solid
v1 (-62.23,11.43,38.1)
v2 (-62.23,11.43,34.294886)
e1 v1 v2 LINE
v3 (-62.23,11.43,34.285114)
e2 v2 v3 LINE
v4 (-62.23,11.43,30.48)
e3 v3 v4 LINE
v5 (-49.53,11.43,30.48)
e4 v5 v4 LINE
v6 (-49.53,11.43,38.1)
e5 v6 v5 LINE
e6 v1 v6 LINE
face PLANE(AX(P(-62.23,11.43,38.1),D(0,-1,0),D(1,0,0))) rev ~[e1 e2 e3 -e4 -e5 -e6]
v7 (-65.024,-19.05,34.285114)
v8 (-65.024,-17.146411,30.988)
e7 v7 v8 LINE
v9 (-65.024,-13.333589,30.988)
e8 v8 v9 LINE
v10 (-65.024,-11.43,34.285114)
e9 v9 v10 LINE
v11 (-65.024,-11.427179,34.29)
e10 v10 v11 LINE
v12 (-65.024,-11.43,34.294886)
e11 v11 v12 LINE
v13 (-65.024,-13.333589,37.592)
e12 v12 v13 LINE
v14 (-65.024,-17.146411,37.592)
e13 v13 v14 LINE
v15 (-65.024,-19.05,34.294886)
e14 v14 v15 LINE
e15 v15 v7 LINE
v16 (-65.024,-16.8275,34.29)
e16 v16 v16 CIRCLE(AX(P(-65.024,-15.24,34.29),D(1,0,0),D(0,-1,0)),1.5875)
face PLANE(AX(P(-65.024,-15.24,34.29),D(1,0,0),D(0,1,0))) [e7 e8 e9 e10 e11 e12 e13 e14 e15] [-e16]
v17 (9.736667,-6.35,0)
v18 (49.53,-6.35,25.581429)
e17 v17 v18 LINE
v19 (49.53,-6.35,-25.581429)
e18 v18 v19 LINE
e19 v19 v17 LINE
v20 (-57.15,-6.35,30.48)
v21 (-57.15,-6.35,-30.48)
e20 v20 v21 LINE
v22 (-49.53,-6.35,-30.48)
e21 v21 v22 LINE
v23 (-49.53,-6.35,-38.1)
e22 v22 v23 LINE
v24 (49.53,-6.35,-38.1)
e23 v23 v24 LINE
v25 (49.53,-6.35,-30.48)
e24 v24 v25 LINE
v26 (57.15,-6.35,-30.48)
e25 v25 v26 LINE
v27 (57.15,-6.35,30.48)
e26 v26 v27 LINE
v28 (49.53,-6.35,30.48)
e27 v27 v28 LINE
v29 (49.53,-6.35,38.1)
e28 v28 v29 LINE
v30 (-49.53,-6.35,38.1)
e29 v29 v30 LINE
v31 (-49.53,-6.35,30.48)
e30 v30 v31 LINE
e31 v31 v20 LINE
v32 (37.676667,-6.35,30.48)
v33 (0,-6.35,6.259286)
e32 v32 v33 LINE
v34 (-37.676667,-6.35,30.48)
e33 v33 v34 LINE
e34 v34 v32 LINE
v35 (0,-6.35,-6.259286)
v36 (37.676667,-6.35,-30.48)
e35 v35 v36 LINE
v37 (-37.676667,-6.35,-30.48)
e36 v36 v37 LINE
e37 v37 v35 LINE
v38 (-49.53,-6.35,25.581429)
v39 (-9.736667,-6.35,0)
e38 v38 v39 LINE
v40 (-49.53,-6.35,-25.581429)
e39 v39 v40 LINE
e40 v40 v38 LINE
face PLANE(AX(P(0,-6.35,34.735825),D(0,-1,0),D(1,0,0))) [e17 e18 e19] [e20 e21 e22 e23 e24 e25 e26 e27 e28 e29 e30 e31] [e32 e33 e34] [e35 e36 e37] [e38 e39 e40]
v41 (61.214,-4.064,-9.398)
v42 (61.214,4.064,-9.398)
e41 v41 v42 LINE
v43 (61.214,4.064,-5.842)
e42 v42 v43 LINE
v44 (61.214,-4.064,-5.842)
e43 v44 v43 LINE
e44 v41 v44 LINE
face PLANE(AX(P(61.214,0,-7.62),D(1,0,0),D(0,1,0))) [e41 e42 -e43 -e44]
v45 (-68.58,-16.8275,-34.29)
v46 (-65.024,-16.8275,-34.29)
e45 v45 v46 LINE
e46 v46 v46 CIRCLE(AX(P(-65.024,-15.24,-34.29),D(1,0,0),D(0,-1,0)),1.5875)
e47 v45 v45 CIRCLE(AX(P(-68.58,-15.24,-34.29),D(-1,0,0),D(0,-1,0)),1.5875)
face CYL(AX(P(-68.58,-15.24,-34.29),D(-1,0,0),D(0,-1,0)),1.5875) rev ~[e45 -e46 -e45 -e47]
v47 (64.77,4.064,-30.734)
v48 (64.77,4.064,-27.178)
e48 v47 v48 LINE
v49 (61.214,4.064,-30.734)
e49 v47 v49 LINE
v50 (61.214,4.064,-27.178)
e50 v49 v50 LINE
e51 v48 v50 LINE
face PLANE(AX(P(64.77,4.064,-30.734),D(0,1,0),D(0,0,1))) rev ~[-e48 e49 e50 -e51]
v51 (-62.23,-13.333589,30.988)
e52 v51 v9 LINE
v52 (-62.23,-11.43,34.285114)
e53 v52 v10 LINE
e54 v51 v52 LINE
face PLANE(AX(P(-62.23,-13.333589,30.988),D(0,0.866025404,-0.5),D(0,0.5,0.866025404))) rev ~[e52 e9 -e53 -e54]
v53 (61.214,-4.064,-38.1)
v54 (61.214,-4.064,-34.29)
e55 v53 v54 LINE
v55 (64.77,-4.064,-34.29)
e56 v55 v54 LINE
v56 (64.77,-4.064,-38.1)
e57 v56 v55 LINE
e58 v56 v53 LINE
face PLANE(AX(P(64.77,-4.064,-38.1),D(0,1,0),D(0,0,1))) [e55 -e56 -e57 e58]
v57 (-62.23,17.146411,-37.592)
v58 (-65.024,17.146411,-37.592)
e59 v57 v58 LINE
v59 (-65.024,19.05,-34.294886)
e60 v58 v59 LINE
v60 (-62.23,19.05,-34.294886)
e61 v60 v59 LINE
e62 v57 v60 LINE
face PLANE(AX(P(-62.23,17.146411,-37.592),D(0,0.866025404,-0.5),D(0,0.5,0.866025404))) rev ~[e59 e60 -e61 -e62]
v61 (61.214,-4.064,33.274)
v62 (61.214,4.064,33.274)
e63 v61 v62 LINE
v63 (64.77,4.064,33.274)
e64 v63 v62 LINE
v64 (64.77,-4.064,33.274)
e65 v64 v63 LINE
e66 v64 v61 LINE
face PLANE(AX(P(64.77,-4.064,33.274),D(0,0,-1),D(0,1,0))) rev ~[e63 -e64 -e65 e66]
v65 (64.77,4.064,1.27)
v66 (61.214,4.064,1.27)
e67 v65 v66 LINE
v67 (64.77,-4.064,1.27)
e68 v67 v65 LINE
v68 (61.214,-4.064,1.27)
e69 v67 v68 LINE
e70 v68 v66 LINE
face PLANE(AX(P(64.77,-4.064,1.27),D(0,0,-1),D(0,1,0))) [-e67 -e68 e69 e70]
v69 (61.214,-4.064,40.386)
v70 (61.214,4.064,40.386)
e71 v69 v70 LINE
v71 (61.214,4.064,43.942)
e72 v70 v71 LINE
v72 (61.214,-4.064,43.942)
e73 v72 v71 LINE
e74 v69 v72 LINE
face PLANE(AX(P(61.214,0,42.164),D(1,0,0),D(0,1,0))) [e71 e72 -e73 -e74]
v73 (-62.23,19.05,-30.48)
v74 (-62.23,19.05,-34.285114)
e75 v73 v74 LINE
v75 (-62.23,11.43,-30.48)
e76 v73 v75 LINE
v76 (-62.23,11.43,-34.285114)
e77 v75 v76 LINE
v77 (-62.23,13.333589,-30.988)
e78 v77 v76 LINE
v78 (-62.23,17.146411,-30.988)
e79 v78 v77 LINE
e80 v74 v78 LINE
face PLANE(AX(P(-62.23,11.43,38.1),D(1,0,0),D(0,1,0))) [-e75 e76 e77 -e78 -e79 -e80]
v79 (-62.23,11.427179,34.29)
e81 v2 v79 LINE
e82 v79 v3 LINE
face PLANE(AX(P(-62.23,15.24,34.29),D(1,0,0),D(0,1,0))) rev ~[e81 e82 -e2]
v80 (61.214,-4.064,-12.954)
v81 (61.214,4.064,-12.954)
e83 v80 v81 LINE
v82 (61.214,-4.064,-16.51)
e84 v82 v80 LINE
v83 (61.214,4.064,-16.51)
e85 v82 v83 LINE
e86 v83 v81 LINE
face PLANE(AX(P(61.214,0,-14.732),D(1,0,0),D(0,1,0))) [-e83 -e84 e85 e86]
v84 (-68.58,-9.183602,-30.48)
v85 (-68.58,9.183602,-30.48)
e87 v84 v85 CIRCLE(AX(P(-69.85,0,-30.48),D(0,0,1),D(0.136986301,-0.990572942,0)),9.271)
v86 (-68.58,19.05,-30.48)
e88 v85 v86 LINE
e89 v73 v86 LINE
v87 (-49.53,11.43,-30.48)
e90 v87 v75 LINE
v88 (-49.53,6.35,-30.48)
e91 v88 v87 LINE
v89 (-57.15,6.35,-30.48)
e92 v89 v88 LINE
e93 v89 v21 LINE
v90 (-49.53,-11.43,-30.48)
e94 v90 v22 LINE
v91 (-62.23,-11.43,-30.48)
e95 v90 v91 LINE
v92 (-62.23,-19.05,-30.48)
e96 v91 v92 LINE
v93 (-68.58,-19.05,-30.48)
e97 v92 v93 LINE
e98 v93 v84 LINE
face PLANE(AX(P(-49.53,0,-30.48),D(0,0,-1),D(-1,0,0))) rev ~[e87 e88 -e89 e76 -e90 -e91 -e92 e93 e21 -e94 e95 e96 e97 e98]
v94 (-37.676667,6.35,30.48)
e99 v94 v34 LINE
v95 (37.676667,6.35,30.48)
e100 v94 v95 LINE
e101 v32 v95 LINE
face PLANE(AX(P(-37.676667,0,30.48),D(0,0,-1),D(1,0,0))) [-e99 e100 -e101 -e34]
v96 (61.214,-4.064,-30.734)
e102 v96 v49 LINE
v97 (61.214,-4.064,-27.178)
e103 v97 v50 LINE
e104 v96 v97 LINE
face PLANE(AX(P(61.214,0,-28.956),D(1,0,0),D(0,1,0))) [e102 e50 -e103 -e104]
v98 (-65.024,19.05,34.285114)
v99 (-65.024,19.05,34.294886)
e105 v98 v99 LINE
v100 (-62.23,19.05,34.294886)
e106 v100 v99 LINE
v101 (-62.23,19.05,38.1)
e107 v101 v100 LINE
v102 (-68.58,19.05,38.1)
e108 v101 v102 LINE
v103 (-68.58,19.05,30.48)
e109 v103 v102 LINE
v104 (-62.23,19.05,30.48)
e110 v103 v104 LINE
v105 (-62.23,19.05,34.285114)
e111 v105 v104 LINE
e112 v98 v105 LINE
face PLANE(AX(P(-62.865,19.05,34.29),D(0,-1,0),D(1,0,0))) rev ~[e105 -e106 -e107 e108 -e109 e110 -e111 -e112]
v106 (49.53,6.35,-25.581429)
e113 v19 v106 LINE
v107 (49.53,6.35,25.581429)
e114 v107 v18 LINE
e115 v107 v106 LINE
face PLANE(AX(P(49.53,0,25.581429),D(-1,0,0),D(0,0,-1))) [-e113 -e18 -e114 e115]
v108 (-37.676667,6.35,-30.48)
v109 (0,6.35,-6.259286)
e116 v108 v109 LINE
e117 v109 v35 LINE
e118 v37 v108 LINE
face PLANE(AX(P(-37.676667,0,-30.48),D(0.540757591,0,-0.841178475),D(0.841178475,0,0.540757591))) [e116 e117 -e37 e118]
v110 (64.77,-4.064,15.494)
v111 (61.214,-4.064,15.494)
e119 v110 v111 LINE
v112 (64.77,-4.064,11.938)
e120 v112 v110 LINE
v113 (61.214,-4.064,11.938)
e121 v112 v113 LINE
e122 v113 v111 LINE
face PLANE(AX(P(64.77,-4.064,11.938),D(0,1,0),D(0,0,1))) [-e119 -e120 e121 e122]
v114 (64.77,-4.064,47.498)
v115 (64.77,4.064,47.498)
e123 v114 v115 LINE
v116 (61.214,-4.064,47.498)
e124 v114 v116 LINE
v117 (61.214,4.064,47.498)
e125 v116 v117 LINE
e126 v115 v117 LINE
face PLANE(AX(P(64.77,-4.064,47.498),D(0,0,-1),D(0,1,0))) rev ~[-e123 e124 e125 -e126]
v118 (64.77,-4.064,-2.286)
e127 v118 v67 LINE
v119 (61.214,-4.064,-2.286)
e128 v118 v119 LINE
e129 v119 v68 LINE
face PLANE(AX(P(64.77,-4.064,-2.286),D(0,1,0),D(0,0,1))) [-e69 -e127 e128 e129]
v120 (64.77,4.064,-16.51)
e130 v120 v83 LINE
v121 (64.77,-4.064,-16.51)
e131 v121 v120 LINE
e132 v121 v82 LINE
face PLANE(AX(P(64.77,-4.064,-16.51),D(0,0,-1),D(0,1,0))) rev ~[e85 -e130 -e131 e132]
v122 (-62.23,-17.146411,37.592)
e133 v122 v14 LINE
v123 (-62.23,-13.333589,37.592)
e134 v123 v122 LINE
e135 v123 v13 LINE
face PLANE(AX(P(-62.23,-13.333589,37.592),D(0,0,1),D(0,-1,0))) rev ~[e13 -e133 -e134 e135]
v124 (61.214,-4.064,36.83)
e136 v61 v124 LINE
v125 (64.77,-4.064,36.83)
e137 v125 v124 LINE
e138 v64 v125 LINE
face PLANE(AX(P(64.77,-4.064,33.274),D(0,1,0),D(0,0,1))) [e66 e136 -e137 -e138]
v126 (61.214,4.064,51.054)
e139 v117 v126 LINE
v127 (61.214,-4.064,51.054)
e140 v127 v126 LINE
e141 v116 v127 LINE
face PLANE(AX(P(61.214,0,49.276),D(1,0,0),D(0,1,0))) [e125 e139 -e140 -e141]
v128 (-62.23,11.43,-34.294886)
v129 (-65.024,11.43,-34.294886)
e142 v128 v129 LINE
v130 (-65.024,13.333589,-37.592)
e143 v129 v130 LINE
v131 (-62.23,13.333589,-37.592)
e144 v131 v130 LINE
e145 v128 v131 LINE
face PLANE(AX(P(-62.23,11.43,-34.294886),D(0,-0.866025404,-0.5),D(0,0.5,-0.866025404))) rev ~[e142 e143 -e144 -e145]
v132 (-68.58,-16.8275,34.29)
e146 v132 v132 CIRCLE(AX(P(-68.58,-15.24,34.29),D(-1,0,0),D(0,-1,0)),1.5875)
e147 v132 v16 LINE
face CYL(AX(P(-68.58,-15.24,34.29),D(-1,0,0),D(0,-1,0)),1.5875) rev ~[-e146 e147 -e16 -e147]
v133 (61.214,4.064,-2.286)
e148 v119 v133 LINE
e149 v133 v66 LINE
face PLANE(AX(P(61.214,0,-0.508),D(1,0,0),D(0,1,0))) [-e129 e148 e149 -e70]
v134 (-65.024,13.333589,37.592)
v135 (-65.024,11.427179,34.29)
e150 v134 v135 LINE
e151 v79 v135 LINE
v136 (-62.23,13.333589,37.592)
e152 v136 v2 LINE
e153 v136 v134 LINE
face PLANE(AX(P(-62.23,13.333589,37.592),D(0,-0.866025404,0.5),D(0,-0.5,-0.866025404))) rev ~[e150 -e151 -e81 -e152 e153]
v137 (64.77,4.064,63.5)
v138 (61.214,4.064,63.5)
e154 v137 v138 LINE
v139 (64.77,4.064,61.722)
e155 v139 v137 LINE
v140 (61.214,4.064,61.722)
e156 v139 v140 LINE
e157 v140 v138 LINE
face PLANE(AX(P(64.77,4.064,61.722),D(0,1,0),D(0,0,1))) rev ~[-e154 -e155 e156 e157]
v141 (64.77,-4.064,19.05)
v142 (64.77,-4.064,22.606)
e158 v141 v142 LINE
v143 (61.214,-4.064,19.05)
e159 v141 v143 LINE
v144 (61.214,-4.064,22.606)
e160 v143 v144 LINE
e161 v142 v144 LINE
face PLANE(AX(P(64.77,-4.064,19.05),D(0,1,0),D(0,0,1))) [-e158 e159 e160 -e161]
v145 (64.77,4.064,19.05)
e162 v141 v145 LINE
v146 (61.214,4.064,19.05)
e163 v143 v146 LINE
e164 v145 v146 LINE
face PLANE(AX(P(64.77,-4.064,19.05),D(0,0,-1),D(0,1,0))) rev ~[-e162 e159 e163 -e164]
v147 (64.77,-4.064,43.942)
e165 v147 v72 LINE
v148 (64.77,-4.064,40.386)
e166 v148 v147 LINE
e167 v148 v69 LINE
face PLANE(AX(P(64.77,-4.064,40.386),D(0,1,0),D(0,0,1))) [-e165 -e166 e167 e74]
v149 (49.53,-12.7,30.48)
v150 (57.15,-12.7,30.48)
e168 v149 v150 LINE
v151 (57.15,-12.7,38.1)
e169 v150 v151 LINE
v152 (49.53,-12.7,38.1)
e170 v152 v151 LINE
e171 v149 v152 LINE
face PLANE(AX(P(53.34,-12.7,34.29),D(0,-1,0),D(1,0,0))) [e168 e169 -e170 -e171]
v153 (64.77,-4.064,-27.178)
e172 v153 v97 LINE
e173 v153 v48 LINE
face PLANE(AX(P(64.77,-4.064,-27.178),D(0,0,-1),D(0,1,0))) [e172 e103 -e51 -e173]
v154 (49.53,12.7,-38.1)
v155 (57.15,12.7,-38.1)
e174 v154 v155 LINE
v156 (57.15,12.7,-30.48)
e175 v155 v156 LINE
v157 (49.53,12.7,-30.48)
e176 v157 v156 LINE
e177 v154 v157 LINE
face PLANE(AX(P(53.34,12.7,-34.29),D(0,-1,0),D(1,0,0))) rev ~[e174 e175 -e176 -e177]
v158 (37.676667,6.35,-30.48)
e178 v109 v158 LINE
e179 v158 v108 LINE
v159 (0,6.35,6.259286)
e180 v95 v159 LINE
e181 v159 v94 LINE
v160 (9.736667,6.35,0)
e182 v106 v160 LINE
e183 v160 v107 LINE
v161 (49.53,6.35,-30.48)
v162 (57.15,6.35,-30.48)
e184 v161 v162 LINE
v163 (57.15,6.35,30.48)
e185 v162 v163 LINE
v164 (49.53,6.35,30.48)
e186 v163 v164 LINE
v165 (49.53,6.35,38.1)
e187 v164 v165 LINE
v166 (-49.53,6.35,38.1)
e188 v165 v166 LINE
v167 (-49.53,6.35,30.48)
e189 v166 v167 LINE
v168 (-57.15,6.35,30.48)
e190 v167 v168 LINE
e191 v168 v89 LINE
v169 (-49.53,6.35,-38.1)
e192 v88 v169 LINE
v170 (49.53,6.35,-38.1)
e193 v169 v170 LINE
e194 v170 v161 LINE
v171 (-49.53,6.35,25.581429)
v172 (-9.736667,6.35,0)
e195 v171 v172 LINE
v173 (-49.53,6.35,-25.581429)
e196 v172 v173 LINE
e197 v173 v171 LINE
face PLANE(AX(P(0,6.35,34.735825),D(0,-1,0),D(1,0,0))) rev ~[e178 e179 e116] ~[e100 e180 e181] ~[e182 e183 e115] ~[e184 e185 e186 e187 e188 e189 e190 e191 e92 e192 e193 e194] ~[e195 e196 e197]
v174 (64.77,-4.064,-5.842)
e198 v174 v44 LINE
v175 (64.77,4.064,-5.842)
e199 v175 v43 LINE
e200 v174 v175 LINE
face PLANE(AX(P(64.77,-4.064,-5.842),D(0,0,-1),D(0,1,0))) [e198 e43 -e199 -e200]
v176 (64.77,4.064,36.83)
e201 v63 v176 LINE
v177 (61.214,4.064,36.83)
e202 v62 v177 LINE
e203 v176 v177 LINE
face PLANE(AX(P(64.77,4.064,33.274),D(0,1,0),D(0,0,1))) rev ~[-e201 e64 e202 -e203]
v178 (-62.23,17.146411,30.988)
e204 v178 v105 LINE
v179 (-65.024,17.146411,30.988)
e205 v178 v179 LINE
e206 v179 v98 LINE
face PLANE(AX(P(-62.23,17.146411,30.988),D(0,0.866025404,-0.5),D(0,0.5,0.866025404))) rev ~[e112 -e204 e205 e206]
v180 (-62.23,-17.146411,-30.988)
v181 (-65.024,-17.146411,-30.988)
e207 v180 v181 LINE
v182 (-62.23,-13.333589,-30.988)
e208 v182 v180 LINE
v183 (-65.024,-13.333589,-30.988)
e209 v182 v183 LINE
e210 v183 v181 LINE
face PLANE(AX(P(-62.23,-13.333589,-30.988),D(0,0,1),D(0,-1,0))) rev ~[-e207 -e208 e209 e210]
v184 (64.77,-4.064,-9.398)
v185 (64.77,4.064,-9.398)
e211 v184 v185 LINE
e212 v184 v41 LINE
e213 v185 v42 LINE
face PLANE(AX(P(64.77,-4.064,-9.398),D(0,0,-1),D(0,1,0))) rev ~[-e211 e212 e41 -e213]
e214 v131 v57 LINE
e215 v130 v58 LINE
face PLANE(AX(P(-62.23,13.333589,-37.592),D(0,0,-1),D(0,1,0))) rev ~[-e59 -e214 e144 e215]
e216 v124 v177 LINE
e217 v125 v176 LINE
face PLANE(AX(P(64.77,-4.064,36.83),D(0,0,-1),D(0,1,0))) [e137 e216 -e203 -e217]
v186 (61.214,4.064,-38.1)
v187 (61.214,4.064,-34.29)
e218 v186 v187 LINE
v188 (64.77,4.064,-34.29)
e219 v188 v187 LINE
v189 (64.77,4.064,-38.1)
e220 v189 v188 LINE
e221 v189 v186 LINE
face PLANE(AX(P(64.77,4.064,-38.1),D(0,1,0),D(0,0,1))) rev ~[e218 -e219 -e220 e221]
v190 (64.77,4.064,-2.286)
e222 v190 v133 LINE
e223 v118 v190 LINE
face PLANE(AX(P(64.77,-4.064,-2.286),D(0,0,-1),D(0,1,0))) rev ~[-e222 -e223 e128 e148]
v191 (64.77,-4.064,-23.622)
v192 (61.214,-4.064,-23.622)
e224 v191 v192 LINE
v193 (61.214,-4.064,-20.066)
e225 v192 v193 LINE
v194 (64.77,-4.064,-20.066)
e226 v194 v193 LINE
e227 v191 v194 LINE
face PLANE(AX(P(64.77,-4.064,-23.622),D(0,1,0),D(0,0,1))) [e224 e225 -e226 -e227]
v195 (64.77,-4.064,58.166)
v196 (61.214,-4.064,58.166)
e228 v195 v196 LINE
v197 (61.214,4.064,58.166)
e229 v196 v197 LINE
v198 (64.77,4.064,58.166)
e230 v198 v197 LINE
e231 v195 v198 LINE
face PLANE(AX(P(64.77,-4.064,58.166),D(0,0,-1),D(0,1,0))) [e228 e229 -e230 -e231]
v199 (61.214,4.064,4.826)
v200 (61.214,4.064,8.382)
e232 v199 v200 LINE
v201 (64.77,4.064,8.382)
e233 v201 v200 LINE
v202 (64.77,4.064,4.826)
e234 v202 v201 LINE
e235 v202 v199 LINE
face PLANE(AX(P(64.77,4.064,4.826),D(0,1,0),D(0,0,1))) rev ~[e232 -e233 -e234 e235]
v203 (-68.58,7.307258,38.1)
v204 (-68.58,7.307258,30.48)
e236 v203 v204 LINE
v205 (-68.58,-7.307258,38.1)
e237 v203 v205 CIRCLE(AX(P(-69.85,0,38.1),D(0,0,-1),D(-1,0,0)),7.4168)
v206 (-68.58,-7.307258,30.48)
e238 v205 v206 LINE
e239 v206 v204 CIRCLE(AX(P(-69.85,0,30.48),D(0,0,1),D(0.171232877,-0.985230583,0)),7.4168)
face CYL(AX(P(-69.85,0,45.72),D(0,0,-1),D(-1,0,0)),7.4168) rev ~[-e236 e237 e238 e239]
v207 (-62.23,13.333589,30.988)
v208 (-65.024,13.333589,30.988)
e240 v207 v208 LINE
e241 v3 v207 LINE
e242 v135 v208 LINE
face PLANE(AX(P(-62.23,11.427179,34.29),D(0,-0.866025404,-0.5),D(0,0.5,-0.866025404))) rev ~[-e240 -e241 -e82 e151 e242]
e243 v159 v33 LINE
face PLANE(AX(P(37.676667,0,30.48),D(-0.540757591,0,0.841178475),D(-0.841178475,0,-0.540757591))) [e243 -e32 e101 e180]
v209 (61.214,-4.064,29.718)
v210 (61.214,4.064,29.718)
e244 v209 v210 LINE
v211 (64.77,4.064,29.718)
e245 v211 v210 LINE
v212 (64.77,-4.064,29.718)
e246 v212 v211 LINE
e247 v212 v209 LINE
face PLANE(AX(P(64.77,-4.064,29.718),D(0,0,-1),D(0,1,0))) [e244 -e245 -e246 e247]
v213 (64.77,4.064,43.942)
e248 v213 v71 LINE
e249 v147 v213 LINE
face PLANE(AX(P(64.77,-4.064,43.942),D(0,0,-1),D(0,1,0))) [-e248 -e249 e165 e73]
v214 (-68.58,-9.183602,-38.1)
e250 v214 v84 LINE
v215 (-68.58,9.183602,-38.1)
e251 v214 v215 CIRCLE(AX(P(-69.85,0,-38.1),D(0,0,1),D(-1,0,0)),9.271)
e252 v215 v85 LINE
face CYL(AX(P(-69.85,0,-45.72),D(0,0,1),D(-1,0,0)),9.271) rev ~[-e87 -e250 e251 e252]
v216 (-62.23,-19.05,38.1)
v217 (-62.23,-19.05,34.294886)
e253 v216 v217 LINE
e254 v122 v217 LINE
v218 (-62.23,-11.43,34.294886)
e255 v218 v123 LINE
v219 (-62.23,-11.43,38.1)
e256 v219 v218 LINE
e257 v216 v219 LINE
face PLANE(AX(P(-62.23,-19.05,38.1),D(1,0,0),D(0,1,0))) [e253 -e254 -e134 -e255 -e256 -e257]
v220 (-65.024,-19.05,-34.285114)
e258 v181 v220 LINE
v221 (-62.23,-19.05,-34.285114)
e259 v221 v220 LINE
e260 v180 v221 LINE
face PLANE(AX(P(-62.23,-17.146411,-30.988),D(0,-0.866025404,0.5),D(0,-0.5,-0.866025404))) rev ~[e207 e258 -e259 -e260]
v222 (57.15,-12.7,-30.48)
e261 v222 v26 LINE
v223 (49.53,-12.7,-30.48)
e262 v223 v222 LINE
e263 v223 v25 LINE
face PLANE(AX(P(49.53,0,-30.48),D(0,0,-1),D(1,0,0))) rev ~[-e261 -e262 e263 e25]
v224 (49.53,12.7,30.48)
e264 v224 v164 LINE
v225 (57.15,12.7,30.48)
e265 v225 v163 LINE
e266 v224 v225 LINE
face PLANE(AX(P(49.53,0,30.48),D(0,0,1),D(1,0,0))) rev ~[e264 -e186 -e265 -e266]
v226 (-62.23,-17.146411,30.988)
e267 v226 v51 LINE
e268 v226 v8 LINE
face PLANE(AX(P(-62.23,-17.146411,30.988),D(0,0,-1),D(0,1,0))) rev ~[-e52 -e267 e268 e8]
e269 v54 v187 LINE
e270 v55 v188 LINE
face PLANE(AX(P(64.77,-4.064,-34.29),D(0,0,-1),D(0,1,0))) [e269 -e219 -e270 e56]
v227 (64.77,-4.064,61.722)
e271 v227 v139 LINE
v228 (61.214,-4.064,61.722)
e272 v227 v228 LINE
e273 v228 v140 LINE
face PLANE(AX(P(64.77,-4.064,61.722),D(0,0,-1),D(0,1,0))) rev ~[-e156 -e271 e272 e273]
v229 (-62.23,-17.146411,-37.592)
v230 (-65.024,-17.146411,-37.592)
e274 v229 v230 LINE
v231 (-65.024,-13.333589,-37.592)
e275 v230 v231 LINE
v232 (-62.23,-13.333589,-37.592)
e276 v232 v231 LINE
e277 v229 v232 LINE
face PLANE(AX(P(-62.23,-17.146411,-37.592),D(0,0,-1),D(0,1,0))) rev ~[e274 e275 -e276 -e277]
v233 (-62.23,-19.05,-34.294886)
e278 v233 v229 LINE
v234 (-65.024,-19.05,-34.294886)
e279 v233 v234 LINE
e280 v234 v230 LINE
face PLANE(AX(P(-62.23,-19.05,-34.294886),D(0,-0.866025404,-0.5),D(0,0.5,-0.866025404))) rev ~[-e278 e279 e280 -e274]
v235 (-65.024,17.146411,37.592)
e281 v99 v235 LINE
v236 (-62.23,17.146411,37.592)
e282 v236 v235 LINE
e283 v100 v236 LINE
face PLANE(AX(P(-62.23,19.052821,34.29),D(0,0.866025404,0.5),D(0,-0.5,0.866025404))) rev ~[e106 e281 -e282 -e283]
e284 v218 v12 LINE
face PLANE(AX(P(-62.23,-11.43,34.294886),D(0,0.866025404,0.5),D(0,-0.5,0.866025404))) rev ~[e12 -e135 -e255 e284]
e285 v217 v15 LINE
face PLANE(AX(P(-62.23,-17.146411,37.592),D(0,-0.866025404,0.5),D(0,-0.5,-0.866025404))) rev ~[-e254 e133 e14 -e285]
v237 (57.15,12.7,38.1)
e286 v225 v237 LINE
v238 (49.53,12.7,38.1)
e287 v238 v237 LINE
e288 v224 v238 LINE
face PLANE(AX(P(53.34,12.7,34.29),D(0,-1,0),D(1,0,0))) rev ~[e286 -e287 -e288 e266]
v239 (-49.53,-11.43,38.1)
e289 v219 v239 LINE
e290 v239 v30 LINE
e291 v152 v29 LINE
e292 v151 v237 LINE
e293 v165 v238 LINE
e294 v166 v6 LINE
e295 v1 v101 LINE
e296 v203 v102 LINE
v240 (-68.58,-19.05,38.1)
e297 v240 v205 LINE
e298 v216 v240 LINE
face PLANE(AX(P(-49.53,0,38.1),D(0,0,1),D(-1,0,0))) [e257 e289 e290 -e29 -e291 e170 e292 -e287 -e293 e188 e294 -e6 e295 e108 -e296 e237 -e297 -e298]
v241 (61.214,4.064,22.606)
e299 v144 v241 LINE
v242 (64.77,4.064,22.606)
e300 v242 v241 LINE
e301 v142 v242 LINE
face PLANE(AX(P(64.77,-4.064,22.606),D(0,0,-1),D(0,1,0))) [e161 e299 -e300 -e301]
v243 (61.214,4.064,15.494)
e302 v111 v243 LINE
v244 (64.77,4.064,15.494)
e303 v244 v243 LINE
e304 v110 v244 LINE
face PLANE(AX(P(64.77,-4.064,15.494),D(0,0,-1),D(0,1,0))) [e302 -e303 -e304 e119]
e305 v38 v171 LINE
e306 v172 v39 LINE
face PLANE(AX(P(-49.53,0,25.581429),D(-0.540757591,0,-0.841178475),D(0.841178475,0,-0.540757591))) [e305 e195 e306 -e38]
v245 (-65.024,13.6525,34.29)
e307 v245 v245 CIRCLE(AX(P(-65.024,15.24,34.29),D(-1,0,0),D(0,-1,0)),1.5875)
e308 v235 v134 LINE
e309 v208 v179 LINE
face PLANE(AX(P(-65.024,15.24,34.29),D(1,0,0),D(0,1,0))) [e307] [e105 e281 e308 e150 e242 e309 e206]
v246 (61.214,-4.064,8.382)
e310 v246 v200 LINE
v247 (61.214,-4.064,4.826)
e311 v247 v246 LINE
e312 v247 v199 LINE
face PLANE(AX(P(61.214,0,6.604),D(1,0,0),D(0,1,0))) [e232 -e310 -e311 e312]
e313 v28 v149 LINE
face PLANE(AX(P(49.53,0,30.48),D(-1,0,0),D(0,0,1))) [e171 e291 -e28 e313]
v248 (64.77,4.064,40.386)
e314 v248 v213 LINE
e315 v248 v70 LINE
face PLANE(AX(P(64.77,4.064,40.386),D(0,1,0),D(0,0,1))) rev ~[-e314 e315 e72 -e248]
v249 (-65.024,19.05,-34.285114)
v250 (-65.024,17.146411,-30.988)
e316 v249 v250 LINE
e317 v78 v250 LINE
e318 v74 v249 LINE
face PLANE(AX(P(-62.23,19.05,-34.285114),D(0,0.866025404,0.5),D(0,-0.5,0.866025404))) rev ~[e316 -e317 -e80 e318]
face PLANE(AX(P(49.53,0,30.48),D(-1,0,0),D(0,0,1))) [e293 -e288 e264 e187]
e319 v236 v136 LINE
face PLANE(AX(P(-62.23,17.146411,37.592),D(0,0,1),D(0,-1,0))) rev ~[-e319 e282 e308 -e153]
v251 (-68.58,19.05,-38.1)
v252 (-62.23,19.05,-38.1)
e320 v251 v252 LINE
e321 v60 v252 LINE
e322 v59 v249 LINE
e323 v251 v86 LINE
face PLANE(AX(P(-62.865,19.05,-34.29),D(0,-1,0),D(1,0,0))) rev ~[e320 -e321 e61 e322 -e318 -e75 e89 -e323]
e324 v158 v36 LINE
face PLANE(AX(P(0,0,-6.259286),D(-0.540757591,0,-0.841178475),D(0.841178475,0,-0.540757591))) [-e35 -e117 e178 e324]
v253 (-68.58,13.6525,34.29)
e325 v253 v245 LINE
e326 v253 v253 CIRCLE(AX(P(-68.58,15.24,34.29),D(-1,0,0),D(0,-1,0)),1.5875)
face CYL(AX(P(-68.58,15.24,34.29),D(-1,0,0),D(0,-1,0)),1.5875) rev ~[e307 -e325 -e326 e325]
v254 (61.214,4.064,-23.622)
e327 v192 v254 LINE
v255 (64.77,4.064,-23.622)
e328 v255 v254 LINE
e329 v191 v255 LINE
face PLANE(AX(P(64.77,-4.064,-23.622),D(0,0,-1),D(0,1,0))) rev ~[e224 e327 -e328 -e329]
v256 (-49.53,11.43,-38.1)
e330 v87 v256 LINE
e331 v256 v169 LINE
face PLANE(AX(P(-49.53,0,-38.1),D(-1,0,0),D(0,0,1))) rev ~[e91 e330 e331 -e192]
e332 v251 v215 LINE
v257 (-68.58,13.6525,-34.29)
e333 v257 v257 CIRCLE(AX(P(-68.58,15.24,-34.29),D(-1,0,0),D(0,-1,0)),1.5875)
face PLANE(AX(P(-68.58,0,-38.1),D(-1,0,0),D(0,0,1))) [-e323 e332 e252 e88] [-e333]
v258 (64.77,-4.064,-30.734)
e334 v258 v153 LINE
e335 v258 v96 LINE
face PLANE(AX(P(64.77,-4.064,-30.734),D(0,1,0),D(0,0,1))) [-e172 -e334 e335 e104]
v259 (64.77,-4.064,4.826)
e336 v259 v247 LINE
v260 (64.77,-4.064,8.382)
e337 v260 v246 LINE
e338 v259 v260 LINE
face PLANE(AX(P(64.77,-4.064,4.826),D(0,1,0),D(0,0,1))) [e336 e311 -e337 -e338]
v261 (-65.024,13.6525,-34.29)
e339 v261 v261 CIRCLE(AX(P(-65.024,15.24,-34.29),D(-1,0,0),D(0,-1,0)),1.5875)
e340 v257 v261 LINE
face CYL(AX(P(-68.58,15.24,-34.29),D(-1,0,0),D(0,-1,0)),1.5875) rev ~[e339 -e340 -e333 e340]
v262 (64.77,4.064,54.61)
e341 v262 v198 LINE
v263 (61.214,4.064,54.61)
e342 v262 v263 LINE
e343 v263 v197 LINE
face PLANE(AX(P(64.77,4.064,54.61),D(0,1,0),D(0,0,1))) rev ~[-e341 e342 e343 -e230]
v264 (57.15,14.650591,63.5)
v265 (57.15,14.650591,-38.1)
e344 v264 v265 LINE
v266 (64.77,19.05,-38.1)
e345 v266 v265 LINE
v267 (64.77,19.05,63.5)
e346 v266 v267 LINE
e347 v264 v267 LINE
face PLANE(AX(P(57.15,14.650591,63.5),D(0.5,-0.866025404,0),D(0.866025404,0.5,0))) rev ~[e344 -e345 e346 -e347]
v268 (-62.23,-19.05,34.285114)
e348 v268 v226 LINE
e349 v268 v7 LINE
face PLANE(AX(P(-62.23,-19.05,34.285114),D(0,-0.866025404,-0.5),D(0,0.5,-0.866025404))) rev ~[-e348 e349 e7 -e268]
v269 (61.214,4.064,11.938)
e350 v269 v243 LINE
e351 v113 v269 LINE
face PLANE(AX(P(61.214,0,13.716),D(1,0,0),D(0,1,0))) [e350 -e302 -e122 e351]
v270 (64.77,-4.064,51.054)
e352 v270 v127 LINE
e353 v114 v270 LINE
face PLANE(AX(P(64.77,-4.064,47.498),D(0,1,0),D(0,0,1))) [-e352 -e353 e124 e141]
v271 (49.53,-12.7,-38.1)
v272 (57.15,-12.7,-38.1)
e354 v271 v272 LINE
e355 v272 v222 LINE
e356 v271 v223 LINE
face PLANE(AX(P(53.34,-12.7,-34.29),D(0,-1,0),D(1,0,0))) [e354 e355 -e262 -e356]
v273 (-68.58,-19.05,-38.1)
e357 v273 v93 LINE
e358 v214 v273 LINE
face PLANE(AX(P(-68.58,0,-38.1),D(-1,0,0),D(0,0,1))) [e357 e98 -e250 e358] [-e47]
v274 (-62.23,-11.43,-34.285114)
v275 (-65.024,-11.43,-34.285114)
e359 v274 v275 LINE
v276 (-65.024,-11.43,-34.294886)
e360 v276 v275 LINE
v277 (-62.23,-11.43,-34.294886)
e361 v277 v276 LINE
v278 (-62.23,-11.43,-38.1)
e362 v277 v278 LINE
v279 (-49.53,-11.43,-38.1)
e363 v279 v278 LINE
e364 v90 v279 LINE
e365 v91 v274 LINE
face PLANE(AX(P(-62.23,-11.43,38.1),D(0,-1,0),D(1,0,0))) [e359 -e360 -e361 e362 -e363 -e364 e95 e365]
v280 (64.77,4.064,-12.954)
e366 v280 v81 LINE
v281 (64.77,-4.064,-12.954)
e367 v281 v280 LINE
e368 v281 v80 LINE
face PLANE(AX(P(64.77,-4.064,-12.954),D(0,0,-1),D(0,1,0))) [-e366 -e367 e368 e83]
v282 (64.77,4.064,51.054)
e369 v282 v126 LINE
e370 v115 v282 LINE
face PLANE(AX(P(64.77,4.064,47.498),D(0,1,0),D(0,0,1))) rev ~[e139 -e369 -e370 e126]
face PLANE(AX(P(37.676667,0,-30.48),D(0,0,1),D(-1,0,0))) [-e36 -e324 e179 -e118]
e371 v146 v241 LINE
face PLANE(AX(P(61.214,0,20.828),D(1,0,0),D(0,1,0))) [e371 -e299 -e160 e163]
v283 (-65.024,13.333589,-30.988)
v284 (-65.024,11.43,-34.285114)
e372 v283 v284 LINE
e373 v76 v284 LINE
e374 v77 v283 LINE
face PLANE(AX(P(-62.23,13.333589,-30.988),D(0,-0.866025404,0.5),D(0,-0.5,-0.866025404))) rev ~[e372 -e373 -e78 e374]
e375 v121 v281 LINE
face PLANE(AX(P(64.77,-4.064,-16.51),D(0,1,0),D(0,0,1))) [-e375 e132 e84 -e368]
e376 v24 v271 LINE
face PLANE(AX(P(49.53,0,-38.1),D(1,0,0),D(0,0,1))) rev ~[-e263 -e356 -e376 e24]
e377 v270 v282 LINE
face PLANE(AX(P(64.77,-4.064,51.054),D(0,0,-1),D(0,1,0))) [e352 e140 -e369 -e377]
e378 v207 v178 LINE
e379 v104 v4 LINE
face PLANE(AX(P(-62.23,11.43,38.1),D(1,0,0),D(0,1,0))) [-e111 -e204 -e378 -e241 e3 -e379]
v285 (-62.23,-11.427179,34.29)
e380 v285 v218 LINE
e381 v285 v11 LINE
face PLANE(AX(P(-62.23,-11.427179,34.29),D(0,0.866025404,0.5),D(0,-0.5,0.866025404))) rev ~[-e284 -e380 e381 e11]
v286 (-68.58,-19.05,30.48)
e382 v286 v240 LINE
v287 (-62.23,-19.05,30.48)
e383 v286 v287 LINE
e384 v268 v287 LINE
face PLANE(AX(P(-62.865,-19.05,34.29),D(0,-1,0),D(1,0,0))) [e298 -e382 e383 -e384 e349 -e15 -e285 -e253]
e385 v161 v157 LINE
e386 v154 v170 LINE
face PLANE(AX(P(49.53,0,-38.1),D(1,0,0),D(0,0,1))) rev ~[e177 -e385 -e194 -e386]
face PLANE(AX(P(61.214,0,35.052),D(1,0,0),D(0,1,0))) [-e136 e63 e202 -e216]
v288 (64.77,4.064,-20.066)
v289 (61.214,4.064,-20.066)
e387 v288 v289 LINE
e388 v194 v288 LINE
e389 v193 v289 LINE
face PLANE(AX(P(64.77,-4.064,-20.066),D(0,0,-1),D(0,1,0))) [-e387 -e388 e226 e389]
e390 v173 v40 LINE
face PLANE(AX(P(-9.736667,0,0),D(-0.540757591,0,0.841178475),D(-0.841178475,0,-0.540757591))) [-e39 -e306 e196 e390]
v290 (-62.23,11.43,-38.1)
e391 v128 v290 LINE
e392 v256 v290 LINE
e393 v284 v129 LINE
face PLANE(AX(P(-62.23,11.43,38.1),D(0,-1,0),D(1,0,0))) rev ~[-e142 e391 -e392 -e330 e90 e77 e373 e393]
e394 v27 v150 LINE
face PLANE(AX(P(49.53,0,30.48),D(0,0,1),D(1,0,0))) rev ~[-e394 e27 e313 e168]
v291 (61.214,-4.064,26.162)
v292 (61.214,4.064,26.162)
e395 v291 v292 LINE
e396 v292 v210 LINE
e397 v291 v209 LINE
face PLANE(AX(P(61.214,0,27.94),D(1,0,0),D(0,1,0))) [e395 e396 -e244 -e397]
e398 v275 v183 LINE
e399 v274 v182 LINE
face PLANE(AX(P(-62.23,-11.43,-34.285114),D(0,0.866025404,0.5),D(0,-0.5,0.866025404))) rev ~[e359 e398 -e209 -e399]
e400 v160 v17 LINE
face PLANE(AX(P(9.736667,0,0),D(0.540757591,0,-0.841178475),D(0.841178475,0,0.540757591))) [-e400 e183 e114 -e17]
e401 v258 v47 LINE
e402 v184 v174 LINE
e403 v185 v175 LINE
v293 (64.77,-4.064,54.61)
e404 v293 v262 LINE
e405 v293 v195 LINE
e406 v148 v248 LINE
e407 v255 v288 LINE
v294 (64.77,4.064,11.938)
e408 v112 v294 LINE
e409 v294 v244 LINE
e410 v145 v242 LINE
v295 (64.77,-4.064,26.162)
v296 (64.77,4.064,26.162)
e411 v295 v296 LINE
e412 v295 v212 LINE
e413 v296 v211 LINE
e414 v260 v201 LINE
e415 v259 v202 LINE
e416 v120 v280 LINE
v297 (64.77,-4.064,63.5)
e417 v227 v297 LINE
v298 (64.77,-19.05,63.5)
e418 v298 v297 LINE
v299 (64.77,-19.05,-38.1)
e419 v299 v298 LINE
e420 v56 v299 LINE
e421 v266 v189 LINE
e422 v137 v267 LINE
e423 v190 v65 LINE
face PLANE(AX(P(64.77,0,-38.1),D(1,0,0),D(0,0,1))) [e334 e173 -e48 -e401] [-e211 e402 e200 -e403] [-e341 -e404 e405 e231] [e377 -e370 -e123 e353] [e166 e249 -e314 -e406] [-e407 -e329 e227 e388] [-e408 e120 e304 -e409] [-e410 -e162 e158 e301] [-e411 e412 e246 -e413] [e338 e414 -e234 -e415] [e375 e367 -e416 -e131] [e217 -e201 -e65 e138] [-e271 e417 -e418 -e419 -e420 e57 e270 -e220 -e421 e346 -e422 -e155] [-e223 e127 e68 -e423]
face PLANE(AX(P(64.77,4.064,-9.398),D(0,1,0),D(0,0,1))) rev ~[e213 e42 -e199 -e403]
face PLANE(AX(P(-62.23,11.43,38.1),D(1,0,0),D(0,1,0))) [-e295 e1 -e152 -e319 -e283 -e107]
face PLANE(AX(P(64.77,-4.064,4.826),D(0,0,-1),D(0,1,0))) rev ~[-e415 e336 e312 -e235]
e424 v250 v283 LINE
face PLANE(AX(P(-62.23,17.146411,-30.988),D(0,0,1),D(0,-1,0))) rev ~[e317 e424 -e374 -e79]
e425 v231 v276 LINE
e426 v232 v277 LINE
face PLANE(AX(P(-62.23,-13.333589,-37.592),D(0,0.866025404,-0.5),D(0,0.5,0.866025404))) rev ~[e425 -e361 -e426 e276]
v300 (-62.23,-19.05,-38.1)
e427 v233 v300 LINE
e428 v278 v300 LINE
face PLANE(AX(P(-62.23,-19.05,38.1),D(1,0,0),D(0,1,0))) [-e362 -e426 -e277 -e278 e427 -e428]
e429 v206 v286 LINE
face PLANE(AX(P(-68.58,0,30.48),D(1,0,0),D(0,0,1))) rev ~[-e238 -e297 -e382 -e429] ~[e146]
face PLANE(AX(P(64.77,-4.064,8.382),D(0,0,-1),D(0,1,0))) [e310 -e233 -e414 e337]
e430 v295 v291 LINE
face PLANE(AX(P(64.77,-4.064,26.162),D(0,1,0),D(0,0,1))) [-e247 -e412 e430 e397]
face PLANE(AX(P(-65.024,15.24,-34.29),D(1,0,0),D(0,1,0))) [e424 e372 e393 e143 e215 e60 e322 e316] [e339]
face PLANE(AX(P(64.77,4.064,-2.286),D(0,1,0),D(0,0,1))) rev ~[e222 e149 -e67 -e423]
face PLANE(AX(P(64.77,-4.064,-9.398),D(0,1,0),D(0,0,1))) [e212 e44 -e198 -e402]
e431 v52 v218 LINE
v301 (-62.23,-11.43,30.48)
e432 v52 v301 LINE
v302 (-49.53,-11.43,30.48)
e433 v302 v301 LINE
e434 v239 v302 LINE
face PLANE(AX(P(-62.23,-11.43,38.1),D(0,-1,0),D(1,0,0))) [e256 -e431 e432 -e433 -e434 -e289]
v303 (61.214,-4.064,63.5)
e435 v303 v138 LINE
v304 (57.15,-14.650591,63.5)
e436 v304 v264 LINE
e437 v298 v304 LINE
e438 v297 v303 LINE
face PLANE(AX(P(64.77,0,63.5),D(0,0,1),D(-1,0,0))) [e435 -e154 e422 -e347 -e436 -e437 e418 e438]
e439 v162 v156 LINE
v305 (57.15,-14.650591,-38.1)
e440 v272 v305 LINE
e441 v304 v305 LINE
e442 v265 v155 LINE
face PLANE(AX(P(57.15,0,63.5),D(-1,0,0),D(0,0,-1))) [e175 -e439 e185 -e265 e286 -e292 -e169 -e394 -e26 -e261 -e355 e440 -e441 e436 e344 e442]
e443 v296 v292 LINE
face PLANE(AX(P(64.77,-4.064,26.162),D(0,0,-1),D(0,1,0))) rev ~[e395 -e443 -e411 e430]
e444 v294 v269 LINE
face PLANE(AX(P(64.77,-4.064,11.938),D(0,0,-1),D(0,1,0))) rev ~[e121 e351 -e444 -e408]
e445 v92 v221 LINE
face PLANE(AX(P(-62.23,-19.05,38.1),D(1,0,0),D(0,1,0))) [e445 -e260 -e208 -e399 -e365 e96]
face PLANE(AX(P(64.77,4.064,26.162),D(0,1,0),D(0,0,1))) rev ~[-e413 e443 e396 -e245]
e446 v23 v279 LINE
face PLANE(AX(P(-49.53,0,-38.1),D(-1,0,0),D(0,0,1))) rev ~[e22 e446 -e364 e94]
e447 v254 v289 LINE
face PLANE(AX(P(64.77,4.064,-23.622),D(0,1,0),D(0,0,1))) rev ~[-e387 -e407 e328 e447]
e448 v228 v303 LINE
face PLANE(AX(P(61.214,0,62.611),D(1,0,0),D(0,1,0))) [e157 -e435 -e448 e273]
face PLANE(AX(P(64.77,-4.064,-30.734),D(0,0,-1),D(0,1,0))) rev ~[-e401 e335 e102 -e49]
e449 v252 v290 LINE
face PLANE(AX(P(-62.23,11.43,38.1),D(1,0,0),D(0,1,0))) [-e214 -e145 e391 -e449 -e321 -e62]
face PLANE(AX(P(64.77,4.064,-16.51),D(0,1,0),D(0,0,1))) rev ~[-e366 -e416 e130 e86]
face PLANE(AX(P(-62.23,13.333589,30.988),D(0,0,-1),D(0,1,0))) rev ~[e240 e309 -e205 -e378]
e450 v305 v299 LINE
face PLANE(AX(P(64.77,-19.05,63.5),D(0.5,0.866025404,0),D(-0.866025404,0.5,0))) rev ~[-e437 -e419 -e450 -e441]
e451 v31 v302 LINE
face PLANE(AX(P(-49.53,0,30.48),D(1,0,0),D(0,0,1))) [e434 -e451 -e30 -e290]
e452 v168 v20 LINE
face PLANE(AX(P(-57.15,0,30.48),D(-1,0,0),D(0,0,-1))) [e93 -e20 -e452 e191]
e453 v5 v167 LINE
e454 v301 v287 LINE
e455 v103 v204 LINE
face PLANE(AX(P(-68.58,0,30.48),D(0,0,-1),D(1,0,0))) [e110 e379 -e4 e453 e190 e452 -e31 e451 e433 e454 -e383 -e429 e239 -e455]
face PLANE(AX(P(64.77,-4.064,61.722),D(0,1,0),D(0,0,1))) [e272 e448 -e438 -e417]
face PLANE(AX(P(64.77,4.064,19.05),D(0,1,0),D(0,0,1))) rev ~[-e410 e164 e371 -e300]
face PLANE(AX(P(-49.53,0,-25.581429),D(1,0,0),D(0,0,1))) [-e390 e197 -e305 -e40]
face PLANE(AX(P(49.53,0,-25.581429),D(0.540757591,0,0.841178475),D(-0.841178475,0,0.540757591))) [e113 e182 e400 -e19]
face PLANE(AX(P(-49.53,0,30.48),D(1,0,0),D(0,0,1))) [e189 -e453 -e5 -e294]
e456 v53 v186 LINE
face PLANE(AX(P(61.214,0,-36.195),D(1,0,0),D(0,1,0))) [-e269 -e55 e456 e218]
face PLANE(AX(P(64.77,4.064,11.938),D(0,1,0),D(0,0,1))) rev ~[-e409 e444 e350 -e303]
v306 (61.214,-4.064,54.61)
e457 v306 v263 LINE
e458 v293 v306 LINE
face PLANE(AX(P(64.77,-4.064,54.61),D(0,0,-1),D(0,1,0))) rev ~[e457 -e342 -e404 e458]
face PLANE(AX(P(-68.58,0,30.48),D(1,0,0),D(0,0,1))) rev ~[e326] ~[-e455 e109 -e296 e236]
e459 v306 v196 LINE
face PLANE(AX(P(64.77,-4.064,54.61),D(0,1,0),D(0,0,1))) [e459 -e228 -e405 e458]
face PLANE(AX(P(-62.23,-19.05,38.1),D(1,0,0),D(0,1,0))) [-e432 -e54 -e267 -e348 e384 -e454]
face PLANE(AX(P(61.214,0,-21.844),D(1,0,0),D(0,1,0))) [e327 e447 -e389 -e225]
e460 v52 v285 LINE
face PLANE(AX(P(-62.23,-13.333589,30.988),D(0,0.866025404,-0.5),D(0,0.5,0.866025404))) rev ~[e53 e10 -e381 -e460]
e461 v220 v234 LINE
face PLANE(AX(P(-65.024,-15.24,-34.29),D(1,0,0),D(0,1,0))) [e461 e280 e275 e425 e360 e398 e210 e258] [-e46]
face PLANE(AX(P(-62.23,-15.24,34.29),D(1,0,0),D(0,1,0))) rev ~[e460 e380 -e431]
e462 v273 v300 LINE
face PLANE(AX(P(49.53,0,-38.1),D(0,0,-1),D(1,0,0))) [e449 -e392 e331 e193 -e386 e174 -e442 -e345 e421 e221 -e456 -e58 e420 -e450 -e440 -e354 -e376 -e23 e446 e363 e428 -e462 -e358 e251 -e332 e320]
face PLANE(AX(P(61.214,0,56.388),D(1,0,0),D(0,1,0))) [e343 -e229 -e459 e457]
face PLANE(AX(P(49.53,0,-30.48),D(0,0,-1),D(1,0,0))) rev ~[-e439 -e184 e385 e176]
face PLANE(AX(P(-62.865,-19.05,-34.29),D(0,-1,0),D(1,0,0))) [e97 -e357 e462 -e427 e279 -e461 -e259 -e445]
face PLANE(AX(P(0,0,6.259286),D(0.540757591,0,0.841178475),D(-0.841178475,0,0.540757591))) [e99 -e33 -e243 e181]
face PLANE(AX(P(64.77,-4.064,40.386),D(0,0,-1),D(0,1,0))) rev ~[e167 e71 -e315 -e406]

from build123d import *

# Parameters (mm, degrees)
F1_DEPTH  = 6.35
F0_W      = 11.43
F0_H      = 7.62
F0_W_2    = 7.62
F2_DEPTH  = 19.05
F3_DEPTH  = 19.05
F4_DEPTH  = 12.7
F6_DEPTH  = 127
F8_D      = 18.542
F8_DEPTH  = 7.62
F8_TIP    = 5.570578799
F10_D     = 14.8336
F10_DEPTH = 7.62
F10_TIP   = 4.4564630392
F11_W     = 8.128
F11_H     = 1.778
F11_H_2   = 3.556
F11_H_3   = 3.81
F12_DEPTH = 3.556
F9_W      = 12.7
F9_H      = 7.62
F15_DEPTH = 76.201
F13_R     = 1.5875
F14_R     = 1.5875
F16_DEPTH = 38.1
F18_R     = 1.5875
F20_R     = 1.5875
F19_R     = 1.5875
F21_DEPTH = 2.794
F22_DEPTH = 2.794


# Not quite as in the source:
# - a feature names something its author has since deleted; it is built from what else it names


with BuildPart() as f1:
    # F0 (on Front) → F1 (new body, symmetric)
    with BuildSketch(Plane.XZ):
        Polygon((49.53, 38.1), (-49.53, 38.1), (-37.6766666667, 30.48), (37.6766666667, 30.48), align=None)
        Polygon((-37.6766666667, -30.48), (-49.53, -38.1), (49.53, -38.1), (37.6766666667, -30.48), align=None)
        Polygon((-49.53, 25.5814285714), (-57.15, 30.48), (-57.15, -30.48), (-49.53, -25.5814285714), align=None)
        Polygon((-49.53, 30.48), (-57.15, 30.48), (-49.53, 25.5814285714), align=None)
        Polygon((-37.6766666667, 30.48), (-49.53, 38.1), (-49.53, 30.48), align=None)
        Polygon((49.53, 30.48), (49.53, 38.1), (37.6766666667, 30.48), align=None)
        Polygon((37.6766666667, -30.48), (49.53, -38.1), (49.53, -30.48), align=None)
        Polygon((-37.6766666667, -30.48), (-49.53, -30.48), (-49.53, -38.1), align=None)
        Polygon((-49.53, -25.5814285714), (-57.15, -30.48), (-49.53, -30.48), align=None)
        Polygon((57.15, -30.48), (57.15, 30.48), (49.53, 25.5814285714), (49.53, -25.5814285714), align=None)
        Polygon((49.53, -30.48), (57.15, -30.48), (49.53, -25.5814285714), align=None)
        Polygon((57.15, 30.48), (49.53, 30.48), (49.53, 25.5814285714), align=None)
        Polygon((49.53, 25.5814285714), (49.53, 30.48), (37.6766666667, 30.48), (0, 6.2592857143), (9.7366666667, 0), align=None)
        Polygon((49.53, -25.5814285714), (9.7366666667, 0), (0, -6.2592857143), (37.6766666667, -30.48), (49.53, -30.48), align=None)
        Polygon((-49.53, -25.5814285714), (-49.53, -30.48), (-37.6766666667, -30.48), (0, -6.2592857143), (-9.7366666667, 0), align=None)
        Polygon((-37.6766666667, 30.48), (-49.53, 30.48), (-49.53, 25.5814285714), (-9.7366666667, 0), (0, 6.2592857143), align=None)
        Polygon((9.7366666667, 0), (0, 6.2592857143), (-9.7366666667, 0), (0, -6.2592857143), align=None)
    extrude(amount=F1_DEPTH, both=True)

    # F0 (on Front) → F2 (join, symmetric)
    with BuildSketch(Plane.XZ):
        with Locations((-62.865, -34.29)):
            Rectangle(F0_W, F0_H)
        with Locations((-62.865, 34.29)):
            Rectangle(F0_W, F0_H)
        with Locations((-53.34, -34.29)):
            Rectangle(F0_W_2, F0_H)
        with Locations((-53.34, 34.29)):
            Rectangle(F0_W_2, F0_H)
    extrude(amount=F2_DEPTH, both=True)

    # F0 (on Front) → F3 (join, symmetric)
    with BuildSketch(Plane.XZ):
        Polygon((57.15, 63.5), (57.15, 38.1), (57.15, 30.48), (57.15, -30.48), (57.15, -38.1), (64.77, -38.1), (64.77, 63.5), align=None)
    extrude(amount=F3_DEPTH, both=True)

    # F0 (on Front) → F4 (join, symmetric)
    with BuildSketch(Plane.XZ):
        with Locations((53.34, 34.29)):
            Rectangle(F0_W_2, F0_H)
        with Locations((53.34, -34.29)):
            Rectangle(F0_W_2, F0_H)
    extrude(amount=F4_DEPTH, both=True)

    # F5 (on face) → F6 (cut)
    with BuildSketch(Plane.XY.offset(63.5)):
        Polygon((57.15, 14.6505909488), (64.77, 19.05), (57.15, 19.05), align=None)
        Polygon((57.15, -19.05), (64.77, -19.05), (57.15, -14.6505909488), align=None)
    extrude(amount=-F6_DEPTH, mode=Mode.SUBTRACT)

    # F8
    with Locations(Plane(origin=(0, 0, -38.1), x_dir=(1, 0, 0), z_dir=(0, 0, -1))):
        with Locations((-69.85, 0)):
            Hole(F8_D / 2, depth=F8_DEPTH)
            with Locations((0, 0, -(F8_DEPTH + F8_TIP / 2))):  # 118° drill point
                Cone(0, F8_D / 2, F8_TIP, mode=Mode.SUBTRACT)

    # F10
    with Locations(Plane.XY.offset(38.1)):
        with Locations((-69.85, 0)):
            Hole(F10_D / 2, depth=F10_DEPTH)
            with Locations((0, 0, -(F10_DEPTH + F10_TIP / 2))):  # 118° drill point
                Cone(0, F10_D / 2, F10_TIP, mode=Mode.SUBTRACT)

    # F11 (on face) → F12 (cut)
    with BuildSketch(Plane.YZ.offset(64.77)):
        with Locations((0, 62.611)):
            Rectangle(F11_W, F11_H)
        with Locations((0, 56.388)):
            Rectangle(F11_W, F11_H_2)
        with Locations((0, 49.276)):
            Rectangle(F11_W, F11_H_2)
        with Locations((0, 42.164)):
            Rectangle(F11_W, F11_H_2)
        with Locations((0, 35.052)):
            Rectangle(F11_W, F11_H_2)
        with Locations((0, 27.94)):
            Rectangle(F11_W, F11_H_2)
        with Locations((0, 20.828)):
            Rectangle(F11_W, F11_H_2)
        with Locations((0, 13.716)):
            Rectangle(F11_W, F11_H_2)
        with Locations((0, 6.604)):
            Rectangle(F11_W, F11_H_2)
        with Locations((0, -0.508)):
            Rectangle(F11_W, F11_H_2)
        with Locations((0, -7.62)):
            Rectangle(F11_W, F11_H_2)
        with Locations((0, -14.732)):
            Rectangle(F11_W, F11_H_2)
        with Locations((0, -21.844)):
            Rectangle(F11_W, F11_H_2)
        with Locations((0, -28.956)):
            Rectangle(F11_W, F11_H_2)
        with Locations((0, -36.195)):
            Rectangle(F11_W, F11_H_3)
    extrude(amount=-F12_DEPTH, mode=Mode.SUBTRACT)

    # F9 (on face) → F15 (cut, through all)
    with BuildSketch(Plane.XY.offset(38.1)):
        with Locations((-55.88, 15.24)):
            Rectangle(F9_W, F9_H)
        with Locations((-55.88, -15.24)):
            Rectangle(F9_W, F9_H)
    extrude(amount=-F15_DEPTH, mode=Mode.SUBTRACT)

    # F13 (on face) + F14 (on face) → F16 (cut)
    with BuildSketch(Plane(origin=(-68.58, 0, 0), x_dir=(0, -1, 0), z_dir=(-1, 0, 0))):
        with Locations((-15.24, 34.29)):
            Circle(F13_R)
        with Locations((15.24, 34.29)):
            Circle(F13_R)
    with BuildSketch(Plane(origin=(-68.58, 0, 0), x_dir=(0, -1, 0), z_dir=(-1, 0, 0))):
        with Locations((15.24, -34.29)):
            Circle(F14_R)
        with Locations((-15.24, -34.29)):
            Circle(F14_R)
    extrude(amount=-F16_DEPTH, mode=Mode.SUBTRACT)

    # F17 (on face) + F18 (on face) + F20 (on face) + F19 (on face) → F21 (cut)
    with BuildSketch(Plane.YZ.offset(-62.23)):
        Polygon((19.0528211777, 34.29), (17.1464105889, 37.592), (13.3335894111, 37.592), (11.4271788223, 34.29), (13.3335894111, 30.988), (17.1464105889, 30.988), align=None)
    with BuildSketch(Plane.YZ.offset(-62.23)):
        Polygon((-11.43, 34.2948864232), (-13.3335894111, 37.592), (-17.1464105889, 37.592), (-19.05, 34.2948864232), (-19.05, 34.2851135768), (-17.1464105889, 30.988), (-13.3335894111, 30.988), (-11.43, 34.2851135768), align=None)
        with Locations((-15.24, 34.29)):
            Circle(F18_R, mode=Mode.SUBTRACT)
    with BuildSketch(Plane.YZ.offset(-62.23)):
        Polygon((-11.43, -34.2851135768), (-13.3335894111, -30.988), (-17.1464105889, -30.988), (-19.05, -34.2851135768), (-19.05, -34.2948864232), (-17.1464105889, -37.592), (-13.3335894111, -37.592), (-11.43, -34.2948864232), align=None)
        with Locations((-15.24, -34.29)):
            Circle(F20_R, mode=Mode.SUBTRACT)
    with BuildSketch(Plane.YZ.offset(-62.23)):
        Polygon((19.05, -34.2851135768), (17.1464105889, -30.988), (13.3335894111, -30.988), (11.43, -34.2851135768), (11.43, -34.2948864232), (13.3335894111, -37.592), (17.1464105889, -37.592), (19.05, -34.2948864232), align=None)
        with Locations((15.24, -34.29)):
            Circle(F19_R, mode=Mode.SUBTRACT)
    extrude(amount=-F21_DEPTH, mode=Mode.SUBTRACT)

    # F18 (on face) → F22 (cut)
    with BuildSketch(Plane.YZ.offset(-62.23)):
        Polygon((-11.4271788223, 34.29), (-13.3335894111, 37.592), (-17.1464105889, 37.592), (-19.0528211777, 34.29), (-17.1464105889, 30.988), (-13.3335894111, 30.988), align=None)
    extrude(amount=-F22_DEPTH, mode=Mode.SUBTRACT)


solid = f1.part
